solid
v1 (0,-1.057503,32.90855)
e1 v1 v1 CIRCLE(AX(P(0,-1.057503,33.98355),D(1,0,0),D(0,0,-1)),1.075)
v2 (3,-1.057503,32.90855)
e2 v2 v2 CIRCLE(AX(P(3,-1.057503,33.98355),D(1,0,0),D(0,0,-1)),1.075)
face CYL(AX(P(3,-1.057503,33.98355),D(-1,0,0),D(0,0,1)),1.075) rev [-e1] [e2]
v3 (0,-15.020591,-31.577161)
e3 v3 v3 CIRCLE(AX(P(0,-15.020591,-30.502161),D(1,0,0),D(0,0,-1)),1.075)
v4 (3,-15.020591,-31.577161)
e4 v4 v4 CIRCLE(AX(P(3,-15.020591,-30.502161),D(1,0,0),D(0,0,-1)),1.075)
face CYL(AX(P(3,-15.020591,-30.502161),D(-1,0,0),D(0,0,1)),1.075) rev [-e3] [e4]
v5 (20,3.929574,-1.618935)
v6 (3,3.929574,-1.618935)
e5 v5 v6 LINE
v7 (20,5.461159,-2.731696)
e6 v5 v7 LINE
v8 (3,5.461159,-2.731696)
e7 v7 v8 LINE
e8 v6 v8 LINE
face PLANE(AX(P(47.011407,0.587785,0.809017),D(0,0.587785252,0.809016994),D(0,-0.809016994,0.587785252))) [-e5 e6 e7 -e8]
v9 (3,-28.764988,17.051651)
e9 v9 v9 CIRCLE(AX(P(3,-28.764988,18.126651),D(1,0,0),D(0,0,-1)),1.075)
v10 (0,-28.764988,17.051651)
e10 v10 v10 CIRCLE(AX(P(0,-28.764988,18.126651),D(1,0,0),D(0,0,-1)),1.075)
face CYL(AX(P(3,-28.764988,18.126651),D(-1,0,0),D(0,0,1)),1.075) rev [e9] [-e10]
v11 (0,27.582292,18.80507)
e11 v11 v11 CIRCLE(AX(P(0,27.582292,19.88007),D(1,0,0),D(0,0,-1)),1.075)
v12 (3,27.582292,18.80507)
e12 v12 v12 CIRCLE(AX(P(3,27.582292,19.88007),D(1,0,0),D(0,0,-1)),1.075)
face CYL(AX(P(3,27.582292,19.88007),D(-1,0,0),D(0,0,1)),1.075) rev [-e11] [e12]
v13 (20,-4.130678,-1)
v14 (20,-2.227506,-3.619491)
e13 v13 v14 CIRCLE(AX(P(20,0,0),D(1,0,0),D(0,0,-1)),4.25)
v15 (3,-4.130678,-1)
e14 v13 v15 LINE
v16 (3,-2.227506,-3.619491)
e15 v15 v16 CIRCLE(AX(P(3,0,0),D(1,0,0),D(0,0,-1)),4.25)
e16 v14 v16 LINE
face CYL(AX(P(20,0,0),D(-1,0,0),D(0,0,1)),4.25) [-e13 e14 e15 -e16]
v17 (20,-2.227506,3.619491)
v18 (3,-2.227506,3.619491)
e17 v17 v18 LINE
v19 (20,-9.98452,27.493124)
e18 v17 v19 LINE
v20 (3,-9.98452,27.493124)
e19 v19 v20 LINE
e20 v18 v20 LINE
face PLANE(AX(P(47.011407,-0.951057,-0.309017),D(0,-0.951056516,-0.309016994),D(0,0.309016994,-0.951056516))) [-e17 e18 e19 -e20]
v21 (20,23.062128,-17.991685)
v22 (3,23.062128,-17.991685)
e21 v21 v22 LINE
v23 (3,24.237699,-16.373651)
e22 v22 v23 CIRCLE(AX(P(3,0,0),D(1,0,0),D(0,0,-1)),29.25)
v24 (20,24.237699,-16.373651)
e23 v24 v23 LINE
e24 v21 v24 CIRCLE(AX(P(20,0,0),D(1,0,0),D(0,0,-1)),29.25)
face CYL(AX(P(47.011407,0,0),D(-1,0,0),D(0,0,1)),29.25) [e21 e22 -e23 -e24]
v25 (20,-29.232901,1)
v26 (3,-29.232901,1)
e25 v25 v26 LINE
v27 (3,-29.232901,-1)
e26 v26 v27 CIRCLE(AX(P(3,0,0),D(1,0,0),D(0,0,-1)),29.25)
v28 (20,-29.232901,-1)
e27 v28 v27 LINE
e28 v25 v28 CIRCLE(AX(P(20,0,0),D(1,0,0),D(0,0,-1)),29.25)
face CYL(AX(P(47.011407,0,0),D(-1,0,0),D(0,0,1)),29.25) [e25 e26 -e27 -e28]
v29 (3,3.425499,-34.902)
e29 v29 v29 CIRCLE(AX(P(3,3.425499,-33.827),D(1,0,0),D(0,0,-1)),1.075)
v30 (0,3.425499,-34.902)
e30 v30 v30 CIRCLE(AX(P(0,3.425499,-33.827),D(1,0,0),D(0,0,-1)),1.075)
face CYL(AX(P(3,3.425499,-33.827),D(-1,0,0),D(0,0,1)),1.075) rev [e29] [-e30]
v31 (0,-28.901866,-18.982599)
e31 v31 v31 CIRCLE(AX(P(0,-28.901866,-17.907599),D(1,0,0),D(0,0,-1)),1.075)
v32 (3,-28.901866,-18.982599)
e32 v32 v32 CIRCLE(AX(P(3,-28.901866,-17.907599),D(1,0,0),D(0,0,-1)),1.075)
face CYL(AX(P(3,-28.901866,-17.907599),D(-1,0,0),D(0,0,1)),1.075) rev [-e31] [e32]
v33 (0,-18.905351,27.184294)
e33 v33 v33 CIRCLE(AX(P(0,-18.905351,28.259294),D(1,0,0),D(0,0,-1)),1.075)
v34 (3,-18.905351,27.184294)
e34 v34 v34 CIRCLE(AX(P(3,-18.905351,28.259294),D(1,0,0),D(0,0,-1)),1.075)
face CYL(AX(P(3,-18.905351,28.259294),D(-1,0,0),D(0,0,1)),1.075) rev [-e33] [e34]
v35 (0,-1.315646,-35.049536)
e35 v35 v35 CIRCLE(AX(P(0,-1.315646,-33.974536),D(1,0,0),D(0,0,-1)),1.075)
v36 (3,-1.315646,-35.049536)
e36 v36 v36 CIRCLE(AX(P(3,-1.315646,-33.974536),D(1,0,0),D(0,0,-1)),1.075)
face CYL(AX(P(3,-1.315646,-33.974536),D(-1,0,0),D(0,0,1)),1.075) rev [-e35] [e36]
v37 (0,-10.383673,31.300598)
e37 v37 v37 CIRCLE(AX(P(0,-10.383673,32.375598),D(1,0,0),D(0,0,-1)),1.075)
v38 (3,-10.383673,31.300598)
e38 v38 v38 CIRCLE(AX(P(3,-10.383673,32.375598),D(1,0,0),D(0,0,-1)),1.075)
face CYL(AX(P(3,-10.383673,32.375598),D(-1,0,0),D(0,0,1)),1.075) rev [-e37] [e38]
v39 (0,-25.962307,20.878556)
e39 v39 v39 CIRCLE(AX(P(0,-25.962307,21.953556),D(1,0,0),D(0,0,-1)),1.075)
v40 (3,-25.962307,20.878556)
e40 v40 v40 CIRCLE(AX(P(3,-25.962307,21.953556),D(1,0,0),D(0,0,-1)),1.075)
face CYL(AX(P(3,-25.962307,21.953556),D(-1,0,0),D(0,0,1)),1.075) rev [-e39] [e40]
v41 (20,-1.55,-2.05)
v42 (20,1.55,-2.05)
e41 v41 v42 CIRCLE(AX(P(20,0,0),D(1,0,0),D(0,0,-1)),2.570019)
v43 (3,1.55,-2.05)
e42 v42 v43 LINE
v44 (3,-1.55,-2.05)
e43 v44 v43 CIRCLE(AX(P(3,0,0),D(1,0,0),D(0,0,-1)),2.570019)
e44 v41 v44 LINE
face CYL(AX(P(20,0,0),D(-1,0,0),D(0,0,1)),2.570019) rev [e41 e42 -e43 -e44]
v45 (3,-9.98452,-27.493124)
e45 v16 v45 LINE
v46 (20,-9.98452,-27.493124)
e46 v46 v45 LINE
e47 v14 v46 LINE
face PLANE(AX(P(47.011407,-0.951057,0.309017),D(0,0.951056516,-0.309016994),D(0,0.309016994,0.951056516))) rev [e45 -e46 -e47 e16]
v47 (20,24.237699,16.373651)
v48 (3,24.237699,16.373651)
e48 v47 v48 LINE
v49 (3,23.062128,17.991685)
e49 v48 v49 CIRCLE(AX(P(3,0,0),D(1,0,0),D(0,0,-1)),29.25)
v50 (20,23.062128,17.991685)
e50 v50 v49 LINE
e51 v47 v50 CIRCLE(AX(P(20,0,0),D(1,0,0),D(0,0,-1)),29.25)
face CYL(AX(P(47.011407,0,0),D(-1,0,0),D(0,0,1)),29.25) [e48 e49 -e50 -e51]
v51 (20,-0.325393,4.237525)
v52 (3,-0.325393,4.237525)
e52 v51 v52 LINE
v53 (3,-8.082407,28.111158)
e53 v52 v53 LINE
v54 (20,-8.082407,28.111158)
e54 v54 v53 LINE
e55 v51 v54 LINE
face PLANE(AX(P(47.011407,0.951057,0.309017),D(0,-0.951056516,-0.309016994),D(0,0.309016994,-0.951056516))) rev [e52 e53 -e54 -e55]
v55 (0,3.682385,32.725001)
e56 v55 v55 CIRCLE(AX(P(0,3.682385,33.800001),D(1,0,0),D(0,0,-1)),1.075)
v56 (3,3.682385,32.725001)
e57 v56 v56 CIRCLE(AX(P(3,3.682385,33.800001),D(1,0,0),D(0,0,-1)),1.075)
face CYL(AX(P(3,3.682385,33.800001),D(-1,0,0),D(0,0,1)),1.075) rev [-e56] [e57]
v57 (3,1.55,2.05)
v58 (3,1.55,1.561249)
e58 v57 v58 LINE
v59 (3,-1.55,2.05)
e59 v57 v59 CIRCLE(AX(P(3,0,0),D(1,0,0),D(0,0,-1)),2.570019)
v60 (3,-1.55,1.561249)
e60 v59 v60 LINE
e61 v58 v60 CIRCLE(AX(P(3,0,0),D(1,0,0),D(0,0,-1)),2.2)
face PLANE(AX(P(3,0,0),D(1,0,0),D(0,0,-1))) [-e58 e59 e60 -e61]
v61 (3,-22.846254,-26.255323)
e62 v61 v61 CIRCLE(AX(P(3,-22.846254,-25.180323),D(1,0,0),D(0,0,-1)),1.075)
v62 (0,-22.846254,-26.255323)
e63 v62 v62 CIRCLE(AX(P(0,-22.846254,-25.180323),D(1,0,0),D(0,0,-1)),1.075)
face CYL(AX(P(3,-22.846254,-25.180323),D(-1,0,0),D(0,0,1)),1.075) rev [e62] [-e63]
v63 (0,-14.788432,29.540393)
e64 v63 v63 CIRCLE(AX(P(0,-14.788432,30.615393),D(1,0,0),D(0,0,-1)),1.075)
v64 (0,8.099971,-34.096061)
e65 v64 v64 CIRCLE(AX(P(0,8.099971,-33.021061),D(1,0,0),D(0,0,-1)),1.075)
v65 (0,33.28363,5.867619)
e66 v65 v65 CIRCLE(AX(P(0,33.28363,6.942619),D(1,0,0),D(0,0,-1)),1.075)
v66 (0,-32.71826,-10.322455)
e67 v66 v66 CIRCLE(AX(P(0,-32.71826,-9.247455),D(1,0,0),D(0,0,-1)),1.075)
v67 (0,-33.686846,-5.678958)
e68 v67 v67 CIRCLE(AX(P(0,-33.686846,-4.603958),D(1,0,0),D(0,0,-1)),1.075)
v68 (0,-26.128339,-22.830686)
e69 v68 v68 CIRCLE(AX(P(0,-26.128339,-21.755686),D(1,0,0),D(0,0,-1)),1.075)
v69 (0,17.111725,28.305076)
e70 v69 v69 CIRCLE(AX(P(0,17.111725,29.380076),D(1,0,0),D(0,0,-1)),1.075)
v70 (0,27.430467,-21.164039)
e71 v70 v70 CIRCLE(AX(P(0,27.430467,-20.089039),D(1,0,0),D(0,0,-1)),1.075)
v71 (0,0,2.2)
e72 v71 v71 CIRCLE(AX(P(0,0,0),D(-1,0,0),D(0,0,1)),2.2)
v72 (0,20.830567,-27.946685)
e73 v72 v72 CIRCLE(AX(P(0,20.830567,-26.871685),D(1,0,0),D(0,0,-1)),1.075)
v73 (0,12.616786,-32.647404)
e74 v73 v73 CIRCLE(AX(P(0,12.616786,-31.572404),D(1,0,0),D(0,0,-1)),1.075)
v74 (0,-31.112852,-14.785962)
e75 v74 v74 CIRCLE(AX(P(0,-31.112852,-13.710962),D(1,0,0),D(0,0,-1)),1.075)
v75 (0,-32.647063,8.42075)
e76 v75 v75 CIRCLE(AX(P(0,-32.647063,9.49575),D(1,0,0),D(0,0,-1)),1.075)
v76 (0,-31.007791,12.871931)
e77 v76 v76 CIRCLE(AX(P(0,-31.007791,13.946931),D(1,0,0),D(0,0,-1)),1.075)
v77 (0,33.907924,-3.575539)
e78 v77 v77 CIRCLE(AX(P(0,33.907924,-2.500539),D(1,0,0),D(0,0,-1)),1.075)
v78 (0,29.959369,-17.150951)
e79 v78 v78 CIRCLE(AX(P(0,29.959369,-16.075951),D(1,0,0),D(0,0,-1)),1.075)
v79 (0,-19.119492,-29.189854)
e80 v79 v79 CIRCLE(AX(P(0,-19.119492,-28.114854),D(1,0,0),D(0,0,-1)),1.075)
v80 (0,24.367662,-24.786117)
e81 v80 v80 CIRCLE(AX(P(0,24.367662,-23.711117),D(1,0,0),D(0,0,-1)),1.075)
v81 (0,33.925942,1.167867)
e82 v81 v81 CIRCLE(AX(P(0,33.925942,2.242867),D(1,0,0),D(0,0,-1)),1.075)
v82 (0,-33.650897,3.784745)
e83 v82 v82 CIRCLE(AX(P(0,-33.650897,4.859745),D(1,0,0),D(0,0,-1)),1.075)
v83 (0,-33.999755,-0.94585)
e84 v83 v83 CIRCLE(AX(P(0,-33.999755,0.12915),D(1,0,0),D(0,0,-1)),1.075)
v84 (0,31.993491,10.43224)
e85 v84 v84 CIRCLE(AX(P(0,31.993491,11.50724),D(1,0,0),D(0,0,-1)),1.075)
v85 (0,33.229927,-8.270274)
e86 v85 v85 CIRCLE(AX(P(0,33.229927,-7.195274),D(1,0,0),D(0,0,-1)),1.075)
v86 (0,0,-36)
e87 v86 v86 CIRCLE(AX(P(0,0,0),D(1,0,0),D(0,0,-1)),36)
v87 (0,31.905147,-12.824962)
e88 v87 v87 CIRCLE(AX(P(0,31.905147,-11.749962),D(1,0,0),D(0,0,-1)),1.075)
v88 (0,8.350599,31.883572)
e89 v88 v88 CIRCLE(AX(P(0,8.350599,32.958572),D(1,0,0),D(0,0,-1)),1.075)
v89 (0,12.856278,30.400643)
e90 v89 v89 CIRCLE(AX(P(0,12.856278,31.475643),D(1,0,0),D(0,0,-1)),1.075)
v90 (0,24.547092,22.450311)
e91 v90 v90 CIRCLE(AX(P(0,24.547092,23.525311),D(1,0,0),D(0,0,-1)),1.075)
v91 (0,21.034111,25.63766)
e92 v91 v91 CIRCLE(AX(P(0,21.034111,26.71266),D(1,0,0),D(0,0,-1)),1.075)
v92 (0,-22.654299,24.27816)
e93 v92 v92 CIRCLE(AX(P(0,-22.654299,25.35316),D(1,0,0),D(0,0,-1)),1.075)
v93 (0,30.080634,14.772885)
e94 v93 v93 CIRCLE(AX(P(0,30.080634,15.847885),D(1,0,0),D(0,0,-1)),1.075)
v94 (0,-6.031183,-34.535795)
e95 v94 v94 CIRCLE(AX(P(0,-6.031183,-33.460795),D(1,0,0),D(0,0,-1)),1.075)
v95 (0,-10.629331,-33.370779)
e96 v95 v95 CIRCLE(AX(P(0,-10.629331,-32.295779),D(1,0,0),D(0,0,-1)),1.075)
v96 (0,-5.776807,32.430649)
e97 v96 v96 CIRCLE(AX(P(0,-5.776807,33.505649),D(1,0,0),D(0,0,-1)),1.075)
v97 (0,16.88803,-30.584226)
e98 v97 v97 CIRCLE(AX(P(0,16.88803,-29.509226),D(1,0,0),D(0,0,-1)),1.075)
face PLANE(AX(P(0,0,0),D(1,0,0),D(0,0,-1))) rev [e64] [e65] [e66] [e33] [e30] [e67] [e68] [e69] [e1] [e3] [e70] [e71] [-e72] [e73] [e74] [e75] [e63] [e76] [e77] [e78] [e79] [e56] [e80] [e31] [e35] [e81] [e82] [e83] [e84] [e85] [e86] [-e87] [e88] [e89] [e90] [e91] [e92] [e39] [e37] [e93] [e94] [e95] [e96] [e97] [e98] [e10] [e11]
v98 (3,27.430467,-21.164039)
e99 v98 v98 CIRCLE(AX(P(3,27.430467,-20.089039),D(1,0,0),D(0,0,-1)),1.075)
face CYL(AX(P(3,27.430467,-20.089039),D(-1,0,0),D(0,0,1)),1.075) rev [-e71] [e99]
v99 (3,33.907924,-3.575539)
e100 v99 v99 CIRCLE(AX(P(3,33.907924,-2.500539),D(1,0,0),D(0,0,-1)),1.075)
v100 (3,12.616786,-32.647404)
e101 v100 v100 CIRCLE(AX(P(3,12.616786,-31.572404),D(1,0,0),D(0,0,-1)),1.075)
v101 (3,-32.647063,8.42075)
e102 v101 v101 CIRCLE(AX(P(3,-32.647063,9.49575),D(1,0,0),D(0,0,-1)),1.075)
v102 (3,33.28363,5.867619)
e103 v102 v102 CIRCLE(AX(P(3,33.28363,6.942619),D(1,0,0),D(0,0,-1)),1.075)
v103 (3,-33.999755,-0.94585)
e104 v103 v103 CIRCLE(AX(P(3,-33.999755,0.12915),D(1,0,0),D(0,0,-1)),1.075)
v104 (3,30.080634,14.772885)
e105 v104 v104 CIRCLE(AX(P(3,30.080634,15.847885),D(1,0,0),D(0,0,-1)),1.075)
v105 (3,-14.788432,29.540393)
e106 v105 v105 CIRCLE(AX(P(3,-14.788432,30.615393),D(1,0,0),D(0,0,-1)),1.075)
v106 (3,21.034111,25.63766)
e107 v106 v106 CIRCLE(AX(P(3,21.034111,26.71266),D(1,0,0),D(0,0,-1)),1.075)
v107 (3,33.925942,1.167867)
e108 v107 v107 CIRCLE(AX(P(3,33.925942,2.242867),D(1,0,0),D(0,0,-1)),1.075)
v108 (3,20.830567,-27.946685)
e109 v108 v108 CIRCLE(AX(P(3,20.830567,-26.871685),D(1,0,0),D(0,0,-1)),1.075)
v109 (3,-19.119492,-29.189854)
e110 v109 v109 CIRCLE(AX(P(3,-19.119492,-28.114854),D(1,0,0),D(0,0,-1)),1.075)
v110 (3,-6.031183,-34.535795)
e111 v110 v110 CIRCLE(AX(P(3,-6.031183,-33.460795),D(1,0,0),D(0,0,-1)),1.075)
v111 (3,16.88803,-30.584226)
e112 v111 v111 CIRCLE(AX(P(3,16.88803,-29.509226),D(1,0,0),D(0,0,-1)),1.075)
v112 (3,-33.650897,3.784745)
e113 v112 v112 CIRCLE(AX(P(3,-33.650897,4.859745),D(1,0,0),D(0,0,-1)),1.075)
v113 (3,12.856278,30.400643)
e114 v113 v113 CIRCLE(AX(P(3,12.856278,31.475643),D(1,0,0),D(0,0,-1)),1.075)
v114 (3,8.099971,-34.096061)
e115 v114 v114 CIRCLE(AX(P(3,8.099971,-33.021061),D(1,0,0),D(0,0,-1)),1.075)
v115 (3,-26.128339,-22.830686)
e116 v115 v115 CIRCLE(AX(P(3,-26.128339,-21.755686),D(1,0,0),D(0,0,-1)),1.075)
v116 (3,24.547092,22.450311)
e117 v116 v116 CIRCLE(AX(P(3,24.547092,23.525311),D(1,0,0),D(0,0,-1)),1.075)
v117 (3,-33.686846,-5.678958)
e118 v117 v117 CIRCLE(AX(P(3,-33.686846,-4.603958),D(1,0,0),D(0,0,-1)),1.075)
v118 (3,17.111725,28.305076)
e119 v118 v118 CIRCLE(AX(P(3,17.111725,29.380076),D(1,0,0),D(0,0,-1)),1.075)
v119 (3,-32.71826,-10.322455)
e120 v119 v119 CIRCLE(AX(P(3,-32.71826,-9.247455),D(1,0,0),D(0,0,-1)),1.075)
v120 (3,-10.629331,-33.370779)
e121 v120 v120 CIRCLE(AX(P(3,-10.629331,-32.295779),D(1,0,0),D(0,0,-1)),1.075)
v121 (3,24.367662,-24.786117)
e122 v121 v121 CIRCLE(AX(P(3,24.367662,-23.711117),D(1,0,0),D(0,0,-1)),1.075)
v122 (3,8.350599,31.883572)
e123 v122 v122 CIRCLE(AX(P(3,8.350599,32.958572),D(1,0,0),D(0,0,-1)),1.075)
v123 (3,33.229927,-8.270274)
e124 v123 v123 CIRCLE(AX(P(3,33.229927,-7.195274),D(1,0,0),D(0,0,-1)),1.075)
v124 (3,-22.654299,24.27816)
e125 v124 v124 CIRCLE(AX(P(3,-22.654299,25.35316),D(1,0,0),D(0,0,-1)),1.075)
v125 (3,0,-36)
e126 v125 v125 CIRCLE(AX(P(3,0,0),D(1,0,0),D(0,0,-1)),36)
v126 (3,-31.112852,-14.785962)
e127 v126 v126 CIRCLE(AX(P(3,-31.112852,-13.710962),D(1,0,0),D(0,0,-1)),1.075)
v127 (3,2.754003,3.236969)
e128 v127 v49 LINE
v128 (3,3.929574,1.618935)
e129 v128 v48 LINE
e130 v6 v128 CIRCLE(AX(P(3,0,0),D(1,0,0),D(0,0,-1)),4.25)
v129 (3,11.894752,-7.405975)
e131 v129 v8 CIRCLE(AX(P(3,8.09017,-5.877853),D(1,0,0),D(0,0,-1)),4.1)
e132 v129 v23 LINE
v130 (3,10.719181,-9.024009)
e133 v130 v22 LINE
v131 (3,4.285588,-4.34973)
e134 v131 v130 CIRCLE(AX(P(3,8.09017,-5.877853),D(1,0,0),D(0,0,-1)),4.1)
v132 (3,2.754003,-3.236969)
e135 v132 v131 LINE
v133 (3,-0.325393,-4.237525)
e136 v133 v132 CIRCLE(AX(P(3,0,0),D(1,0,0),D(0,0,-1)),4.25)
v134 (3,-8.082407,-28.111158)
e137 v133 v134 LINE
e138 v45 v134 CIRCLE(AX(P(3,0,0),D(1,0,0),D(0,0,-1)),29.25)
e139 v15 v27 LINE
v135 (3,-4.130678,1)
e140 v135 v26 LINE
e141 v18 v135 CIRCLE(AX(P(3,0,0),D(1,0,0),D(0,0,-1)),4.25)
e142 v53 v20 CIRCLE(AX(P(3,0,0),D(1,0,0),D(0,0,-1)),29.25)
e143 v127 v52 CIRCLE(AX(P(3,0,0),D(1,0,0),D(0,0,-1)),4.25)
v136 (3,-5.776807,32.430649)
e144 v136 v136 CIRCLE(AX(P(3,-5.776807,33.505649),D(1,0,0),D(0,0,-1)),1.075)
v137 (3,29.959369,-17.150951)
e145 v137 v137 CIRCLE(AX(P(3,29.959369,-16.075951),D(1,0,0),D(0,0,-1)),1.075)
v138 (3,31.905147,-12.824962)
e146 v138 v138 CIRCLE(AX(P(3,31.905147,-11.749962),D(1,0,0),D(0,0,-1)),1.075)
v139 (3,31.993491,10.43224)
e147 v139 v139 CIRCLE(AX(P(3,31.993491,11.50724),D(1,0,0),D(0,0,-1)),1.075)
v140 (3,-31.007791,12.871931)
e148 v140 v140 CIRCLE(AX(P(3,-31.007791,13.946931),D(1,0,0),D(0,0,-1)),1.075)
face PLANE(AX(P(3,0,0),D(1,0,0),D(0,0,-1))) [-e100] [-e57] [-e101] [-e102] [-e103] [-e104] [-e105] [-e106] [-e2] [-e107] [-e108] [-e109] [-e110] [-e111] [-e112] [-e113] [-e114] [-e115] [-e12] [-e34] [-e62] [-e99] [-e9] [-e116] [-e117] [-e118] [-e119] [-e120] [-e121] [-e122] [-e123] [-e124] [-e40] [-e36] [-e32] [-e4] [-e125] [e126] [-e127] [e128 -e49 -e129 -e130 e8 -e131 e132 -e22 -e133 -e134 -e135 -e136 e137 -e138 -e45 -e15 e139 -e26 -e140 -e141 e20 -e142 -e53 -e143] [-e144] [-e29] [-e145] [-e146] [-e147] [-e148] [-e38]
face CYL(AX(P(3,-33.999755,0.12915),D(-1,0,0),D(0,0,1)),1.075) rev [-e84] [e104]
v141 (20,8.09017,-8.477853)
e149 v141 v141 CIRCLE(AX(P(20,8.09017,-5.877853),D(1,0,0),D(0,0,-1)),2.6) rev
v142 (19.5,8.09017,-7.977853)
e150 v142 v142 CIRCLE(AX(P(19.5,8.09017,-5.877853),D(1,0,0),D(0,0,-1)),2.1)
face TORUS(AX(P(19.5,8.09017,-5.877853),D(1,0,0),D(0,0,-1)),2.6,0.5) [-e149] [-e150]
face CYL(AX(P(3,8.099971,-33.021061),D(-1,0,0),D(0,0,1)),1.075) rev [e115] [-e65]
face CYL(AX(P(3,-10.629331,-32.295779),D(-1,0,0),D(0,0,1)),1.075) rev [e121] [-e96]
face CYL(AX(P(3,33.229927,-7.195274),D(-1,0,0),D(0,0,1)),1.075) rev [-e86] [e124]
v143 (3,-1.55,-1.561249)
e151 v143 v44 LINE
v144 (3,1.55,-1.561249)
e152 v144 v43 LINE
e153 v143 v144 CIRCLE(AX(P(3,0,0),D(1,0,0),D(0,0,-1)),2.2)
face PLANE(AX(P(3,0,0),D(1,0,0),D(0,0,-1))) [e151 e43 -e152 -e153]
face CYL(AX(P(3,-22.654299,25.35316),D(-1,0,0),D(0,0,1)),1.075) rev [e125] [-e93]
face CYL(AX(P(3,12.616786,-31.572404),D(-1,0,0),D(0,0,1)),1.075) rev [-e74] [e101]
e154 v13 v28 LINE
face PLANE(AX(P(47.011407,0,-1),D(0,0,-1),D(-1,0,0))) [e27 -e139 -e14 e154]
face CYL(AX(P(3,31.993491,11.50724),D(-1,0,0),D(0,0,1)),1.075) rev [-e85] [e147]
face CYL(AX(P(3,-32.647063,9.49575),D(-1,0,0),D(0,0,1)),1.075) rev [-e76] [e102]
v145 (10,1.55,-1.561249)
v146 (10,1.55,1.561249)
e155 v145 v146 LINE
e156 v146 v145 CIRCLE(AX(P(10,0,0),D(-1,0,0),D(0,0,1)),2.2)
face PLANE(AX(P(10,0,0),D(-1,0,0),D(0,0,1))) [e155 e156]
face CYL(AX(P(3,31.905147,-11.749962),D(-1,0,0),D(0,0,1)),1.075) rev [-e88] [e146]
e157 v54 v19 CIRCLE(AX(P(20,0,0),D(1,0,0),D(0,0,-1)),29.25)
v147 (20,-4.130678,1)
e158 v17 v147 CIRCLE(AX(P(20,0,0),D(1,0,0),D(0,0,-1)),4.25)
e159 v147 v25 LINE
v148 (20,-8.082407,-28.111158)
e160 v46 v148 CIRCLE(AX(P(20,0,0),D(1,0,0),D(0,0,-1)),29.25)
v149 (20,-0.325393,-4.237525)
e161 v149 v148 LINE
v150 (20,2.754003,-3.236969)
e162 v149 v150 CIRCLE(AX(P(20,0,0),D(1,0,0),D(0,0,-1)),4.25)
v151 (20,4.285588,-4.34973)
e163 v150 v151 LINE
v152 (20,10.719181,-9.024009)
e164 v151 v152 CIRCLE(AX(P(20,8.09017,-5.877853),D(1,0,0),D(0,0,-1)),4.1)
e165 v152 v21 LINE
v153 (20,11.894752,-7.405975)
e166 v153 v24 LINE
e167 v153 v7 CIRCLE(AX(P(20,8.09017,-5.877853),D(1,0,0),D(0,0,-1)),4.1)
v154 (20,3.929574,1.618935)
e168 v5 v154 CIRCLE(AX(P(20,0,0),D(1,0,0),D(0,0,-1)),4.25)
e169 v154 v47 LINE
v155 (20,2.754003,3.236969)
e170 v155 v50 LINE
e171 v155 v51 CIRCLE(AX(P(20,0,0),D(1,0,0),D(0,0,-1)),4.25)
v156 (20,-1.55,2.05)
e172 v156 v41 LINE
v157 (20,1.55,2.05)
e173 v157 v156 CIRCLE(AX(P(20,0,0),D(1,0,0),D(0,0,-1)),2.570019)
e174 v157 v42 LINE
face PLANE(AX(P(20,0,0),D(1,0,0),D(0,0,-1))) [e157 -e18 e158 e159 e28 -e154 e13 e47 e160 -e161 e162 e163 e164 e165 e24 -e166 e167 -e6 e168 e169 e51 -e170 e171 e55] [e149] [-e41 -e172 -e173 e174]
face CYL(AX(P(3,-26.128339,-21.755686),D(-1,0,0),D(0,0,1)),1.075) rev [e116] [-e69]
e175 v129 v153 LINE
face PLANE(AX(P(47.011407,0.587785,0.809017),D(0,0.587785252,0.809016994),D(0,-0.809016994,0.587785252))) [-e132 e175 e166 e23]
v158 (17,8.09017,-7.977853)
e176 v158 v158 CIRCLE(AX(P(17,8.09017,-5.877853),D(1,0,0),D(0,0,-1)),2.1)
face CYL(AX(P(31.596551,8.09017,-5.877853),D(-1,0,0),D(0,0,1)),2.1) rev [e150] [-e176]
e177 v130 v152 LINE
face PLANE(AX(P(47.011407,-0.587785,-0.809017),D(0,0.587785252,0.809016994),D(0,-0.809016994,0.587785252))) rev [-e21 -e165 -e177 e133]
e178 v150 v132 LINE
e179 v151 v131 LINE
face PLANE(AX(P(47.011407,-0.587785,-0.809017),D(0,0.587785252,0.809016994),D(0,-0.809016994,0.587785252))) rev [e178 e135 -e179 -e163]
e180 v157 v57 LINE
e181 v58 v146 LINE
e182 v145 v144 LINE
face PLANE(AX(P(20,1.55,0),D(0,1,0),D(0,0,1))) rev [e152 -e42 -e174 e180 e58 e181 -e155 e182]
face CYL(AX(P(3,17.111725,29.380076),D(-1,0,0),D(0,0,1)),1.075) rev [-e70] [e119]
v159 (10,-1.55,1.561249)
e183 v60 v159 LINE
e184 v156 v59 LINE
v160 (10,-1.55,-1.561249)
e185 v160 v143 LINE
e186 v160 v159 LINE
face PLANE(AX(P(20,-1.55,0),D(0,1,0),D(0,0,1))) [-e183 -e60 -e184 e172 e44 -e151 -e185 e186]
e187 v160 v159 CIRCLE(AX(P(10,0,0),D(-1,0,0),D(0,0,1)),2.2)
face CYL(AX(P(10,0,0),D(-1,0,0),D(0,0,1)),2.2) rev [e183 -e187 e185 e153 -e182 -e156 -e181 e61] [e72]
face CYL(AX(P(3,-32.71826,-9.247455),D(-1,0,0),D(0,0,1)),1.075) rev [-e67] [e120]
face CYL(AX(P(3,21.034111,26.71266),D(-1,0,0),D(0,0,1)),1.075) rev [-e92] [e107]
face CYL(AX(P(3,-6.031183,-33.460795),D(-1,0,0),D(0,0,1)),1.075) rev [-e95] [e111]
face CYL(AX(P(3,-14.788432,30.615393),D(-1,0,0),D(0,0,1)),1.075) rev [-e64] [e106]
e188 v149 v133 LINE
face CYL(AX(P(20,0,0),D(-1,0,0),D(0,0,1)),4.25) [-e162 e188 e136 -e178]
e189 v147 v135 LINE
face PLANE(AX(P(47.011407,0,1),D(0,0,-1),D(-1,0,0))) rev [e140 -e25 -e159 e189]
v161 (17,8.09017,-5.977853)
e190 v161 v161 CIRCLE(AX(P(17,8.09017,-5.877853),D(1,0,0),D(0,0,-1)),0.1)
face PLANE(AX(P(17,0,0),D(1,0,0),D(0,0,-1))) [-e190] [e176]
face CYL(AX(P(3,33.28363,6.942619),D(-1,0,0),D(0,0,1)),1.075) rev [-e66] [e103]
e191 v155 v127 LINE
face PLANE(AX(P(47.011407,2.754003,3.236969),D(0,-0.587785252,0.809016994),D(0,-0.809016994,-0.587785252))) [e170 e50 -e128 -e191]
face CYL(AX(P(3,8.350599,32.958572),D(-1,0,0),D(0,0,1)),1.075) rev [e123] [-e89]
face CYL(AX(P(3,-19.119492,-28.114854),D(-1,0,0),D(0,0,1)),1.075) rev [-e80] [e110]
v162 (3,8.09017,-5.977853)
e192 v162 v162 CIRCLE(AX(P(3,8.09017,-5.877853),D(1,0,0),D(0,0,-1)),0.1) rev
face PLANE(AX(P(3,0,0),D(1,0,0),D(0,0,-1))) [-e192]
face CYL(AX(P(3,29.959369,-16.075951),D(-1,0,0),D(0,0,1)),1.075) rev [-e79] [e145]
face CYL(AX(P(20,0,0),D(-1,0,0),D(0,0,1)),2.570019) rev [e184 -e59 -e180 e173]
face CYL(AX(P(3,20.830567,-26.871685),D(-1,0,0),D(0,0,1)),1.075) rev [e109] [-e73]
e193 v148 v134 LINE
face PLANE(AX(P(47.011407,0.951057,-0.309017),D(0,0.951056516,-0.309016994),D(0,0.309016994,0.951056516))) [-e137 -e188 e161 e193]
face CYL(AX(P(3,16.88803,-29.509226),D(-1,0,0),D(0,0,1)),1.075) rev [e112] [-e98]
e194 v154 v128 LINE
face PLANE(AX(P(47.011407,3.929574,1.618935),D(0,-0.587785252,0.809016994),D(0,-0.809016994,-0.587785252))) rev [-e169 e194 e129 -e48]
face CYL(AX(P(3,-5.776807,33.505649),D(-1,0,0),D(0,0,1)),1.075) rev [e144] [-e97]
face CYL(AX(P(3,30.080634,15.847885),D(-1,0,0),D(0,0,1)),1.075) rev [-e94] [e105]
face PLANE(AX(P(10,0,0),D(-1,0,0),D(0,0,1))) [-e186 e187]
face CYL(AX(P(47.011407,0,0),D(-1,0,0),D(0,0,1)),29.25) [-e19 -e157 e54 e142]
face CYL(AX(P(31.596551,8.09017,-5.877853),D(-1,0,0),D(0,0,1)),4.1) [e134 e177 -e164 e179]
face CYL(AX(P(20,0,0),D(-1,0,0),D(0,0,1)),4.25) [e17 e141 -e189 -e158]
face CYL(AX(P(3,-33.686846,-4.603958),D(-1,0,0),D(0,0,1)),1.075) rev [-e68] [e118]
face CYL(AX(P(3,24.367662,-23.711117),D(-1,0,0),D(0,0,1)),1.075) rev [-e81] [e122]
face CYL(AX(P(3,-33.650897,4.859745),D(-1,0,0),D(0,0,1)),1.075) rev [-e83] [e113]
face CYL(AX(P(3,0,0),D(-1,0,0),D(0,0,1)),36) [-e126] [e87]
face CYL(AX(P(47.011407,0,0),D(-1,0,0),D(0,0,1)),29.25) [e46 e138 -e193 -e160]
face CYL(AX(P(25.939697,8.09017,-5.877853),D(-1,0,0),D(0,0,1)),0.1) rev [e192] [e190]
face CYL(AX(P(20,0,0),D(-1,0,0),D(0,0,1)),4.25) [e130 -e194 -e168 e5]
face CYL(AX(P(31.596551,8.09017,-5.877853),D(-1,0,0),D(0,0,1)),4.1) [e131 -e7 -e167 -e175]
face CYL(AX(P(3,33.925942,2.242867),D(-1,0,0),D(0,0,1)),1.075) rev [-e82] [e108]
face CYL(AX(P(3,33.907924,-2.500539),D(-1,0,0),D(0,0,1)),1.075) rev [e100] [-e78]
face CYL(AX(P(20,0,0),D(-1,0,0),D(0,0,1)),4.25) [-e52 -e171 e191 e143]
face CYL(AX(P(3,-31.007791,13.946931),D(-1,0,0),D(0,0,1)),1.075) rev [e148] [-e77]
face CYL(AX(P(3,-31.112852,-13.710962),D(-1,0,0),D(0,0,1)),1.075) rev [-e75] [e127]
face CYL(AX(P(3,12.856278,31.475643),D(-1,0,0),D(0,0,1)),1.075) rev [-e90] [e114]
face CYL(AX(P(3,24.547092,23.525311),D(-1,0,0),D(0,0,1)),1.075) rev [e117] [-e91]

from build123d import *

# Parameters (mm, degrees)
SKETCH1_R                 = 36
SKETCH1_R_2               = 1.075
SKETCH1_R_3               = 4.25
BOSS_EXTRUDE1_DEPTH       = 3
SKETCH1_3_R               = 4.25
BOSS_EXTRUDE2_DEPTH       = 20
BOSS_EXTRUDE3_DEPTH       = 3
BOSS_EXTRUDE5_DEPTH       = 17
SKETCH3_R                 = 2.2
CUT_EXTRUDE1_DEPTH        = 10
BOSS_EXTRUDE6_DEPTH       = 17
CUT_EXTRUDE2_START        = 3
CUT_EXTRUDE2_DEPTH        = 17
BOSS_EXTRUDE7_START       = 3
BOSS_EXTRUDE7_OUTLINE_R   = 2.1
BOSS_EXTRUDE7_OUTLINE_R_2 = 0.1
BOSS_EXTRUDE7_DEPTH       = 14
FILLET1_R                 = 0.5


# Read off the part's stored shape, not the designer's step: Cut-Extrude2, Boss-Extrude7
with BuildPart() as part:
    # Sketch1 → Boss-Extrude1 (new body)
    with BuildSketch(Plane(origin=(0, 0, 0), x_dir=(0, 0, -1), z_dir=(1, 0, 0))):
        Circle(SKETCH1_R)
        with Locations((20.089039043, 27.430466826)):
            Circle(SKETCH1_R_2, mode=Mode.SUBTRACT)
        with Locations((23.711117025, 24.36766155)):
            Circle(SKETCH1_R_2, mode=Mode.SUBTRACT)
        with Locations((26.871685085, 20.830567459)):
            Circle(SKETCH1_R_2, mode=Mode.SUBTRACT)
        with Locations((29.509226361, 16.888030067)):
            Circle(SKETCH1_R_2, mode=Mode.SUBTRACT)
        with Locations((31.572404113, 12.61678638)):
            Circle(SKETCH1_R_2, mode=Mode.SUBTRACT)
        with Locations((33.021060931, 8.099971297)):
            Circle(SKETCH1_R_2, mode=Mode.SUBTRACT)
        with Locations((33.827000359, 3.425499486)):
            Circle(SKETCH1_R_2, mode=Mode.SUBTRACT)
        with Locations((33.974535702, -1.315645775)):
            Circle(SKETCH1_R_2, mode=Mode.SUBTRACT)
        with Locations((33.460795354, -6.031183488)):
            Circle(SKETCH1_R_2, mode=Mode.SUBTRACT)
        with Locations((32.295778685, -10.629331075)):
            Circle(SKETCH1_R_2, mode=Mode.SUBTRACT)
        with Locations((30.50216142, -15.020590824)):
            Circle(SKETCH1_R_2, mode=Mode.SUBTRACT)
        with Locations((28.114854279, -19.119491857)):
            Circle(SKETCH1_R_2, mode=Mode.SUBTRACT)
        with Locations((25.180323479, -22.84625373)):
            Circle(SKETCH1_R_2, mode=Mode.SUBTRACT)
        with Locations((21.755686325, -26.128339261)):
            Circle(SKETCH1_R_2, mode=Mode.SUBTRACT)
        with Locations((17.907599484, -28.901866388)):
            Circle(SKETCH1_R_2, mode=Mode.SUBTRACT)
        with Locations((13.710961588, -31.112851562)):
            Circle(SKETCH1_R_2, mode=Mode.SUBTRACT)
        with Locations((9.24745542, -32.718260471)):
            Circle(SKETCH1_R_2, mode=Mode.SUBTRACT)
        with Locations((4.603958052, -33.686845656)):
            Circle(SKETCH1_R_2, mode=Mode.SUBTRACT)
        with Locations((-0.129150123, -33.999754709)):
            Circle(SKETCH1_R_2, mode=Mode.SUBTRACT)
        with Locations((-4.859744537, -33.65089721)):
            Circle(SKETCH1_R_2, mode=Mode.SUBTRACT)
        with Locations((-9.495749552, -32.647063274)):
            Circle(SKETCH1_R_2, mode=Mode.SUBTRACT)
        with Locations((-13.946930604, -31.007791388)):
            Circle(SKETCH1_R_2, mode=Mode.SUBTRACT)
        with Locations((-18.126650515, -28.764988112)):
            Circle(SKETCH1_R_2, mode=Mode.SUBTRACT)
        with Locations((-21.953555793, -25.962307063)):
            Circle(SKETCH1_R_2, mode=Mode.SUBTRACT)
        with Locations((-25.353160079, -22.654299239)):
            Circle(SKETCH1_R_2, mode=Mode.SUBTRACT)
        with Locations((-28.259293943, -18.905351249)):
            Circle(SKETCH1_R_2, mode=Mode.SUBTRACT)
        with Locations((-30.615392795, -14.788432101)):
            Circle(SKETCH1_R_2, mode=Mode.SUBTRACT)
        with Locations((-32.375597851, -10.383672944)):
            Circle(SKETCH1_R_2, mode=Mode.SUBTRACT)
        with Locations((-33.505648721, -5.776807404)):
            Circle(SKETCH1_R_2, mode=Mode.SUBTRACT)
        with Locations((-33.983550251, -1.057502879)):
            Circle(SKETCH1_R_2, mode=Mode.SUBTRACT)
        with Locations((-33.800000631, 3.682384736)):
            Circle(SKETCH1_R_2, mode=Mode.SUBTRACT)
        with Locations((-32.958572446, 8.350598921)):
            Circle(SKETCH1_R_2, mode=Mode.SUBTRACT)
        with Locations((-31.475643138, 12.856278197)):
            Circle(SKETCH1_R_2, mode=Mode.SUBTRACT)
        with Locations((-29.380076239, 17.111724641)):
            Circle(SKETCH1_R_2, mode=Mode.SUBTRACT)
        with Locations((-26.712659575, 21.03411083)):
            Circle(SKETCH1_R_2, mode=Mode.SUBTRACT)
        with Locations((-23.525311378, 24.547091977)):
            Circle(SKETCH1_R_2, mode=Mode.SUBTRACT)
        with Locations((-19.880069755, 27.582291901)):
            Circle(SKETCH1_R_2, mode=Mode.SUBTRACT)
        with Locations((-15.847885187, 30.080633888)):
            Circle(SKETCH1_R_2, mode=Mode.SUBTRACT)
        with Locations((-11.507239561, 31.993490552)):
            Circle(SKETCH1_R_2, mode=Mode.SUBTRACT)
        with Locations((-6.942618606, 33.283630314)):
            Circle(SKETCH1_R_2, mode=Mode.SUBTRACT)
        with Locations((-2.242867477, 33.925942072)):
            Circle(SKETCH1_R_2, mode=Mode.SUBTRACT)
        with Locations((2.500538516, 33.907923958)):
            Circle(SKETCH1_R_2, mode=Mode.SUBTRACT)
        with Locations((7.195274371, 33.229926673)):
            Circle(SKETCH1_R_2, mode=Mode.SUBTRACT)
        with Locations((11.749962396, 31.905146665)):
            Circle(SKETCH1_R_2, mode=Mode.SUBTRACT)
        with Locations((16.075950767, 29.959369268)):
            Circle(SKETCH1_R_2, mode=Mode.SUBTRACT)
        Circle(SKETCH1_R_3, mode=Mode.SUBTRACT)
    extrude(amount=BOSS_EXTRUDE1_DEPTH)

    # Sketch1<3> → Boss-Extrude2 (add)
    with BuildSketch(Plane(origin=(0, 0, 0), x_dir=(0, 0, -1), z_dir=(1, 0, 0))):
        Circle(SKETCH1_3_R)
        with BuildLine():
            ThreePointArc((2.05, -1.55), (2.570019455, 0), (2.05, 1.55))
            Line((2.05, 1.55), (-2.05, 1.55))
            ThreePointArc((-2.05, 1.55), (-2.570019455, 0), (-2.05, -1.55))
            Line((-2.05, -1.55), (2.05, -1.55))
        make_face(mode=Mode.SUBTRACT)
    extrude(amount=BOSS_EXTRUDE2_DEPTH)

    # Sketch1<4> → Boss-Extrude3 (add)
    with BuildSketch(Plane(origin=(0, 0, 0), x_dir=(0, 0, -1), z_dir=(1, 0, 0))):
        with BuildLine():
            Line((-2.05, -1.55), (2.05, -1.55))
            ThreePointArc((2.05, -1.55), (2.570019455, 0), (2.05, 1.55))
            Line((2.05, 1.55), (-2.05, 1.55))
            ThreePointArc((-2.05, 1.55), (-2.570019455, 0), (-2.05, -1.55))
        make_face()
    extrude(amount=BOSS_EXTRUDE3_DEPTH)

    # Sketch2 → Boss-Extrude5 (add)
    with BuildSketch(Plane(origin=(3, 0, 0), x_dir=(0, 0, -1), z_dir=(1, 0, 0))):
        with BuildLine():
            Line((-27.493123978, -9.984519716), (-3.619491149, -2.227506189))
            ThreePointArc((-3.619491149, -2.227506189), (-4.041990194, -1.313322226), (-4.237525138, -0.325393156))
            Line((-4.237525138, -0.325393156), (-28.111157966, -8.082406683))
            ThreePointArc((-28.111157966, -8.082406683), (-27.818403102, -9.038747085), (-27.493123978, -9.984519716))
        make_face()
        with BuildLine():
            ThreePointArc((1.618934563, 3.92957388), (2.498087322, 3.438322226), (3.236968552, 2.754003376))
            Line((3.236968552, 2.754003376), (17.991685075, 23.062128439))
            ThreePointArc((17.991685075, 23.062128439), (17.19271863, 23.663747085), (16.373651086, 24.237698944))
            Line((16.373651086, 24.237698944), (1.618934563, 3.92957388))
        make_face()
        with BuildLine():
            ThreePointArc((4.237525138, -0.325393156), (4.041990194, -1.313322226), (3.619491149, -2.227506189))
            Line((3.619491149, -2.227506189), (27.493123978, -9.984519716))
            ThreePointArc((27.493123978, -9.984519716), (27.818403102, -9.038747085), (28.111157966, -8.082406683))
            Line((28.111157966, -8.082406683), (4.237525138, -0.325393156))
        make_face()
        with BuildLine():
            ThreePointArc((1, -4.13067791), (0, -4.25), (-1, -4.13067791))
            Line((-1, -4.13067791), (-1, -29.232900985))
            ThreePointArc((-1, -29.232900985), (0, -29.25), (1, -29.232900985))
            Line((1, -29.232900985), (1, -4.13067791))
        make_face()
        with BuildLine():
            Line((-3.236968552, 2.754003376), (-17.991685075, 23.062128439))
            ThreePointArc((-17.991685075, 23.062128439), (-17.19271863, 23.663747085), (-16.373651086, 24.237698944))
            Line((-16.373651086, 24.237698944), (-1.618934563, 3.92957388))
            ThreePointArc((-1.618934563, 3.92957388), (-2.498087322, 3.438322226), (-3.236968552, 2.754003376))
        make_face()
    extrude(amount=BOSS_EXTRUDE5_DEPTH)

    # Sketch3 → Cut-Extrude1 (cut)
    with BuildSketch(Plane.ZY):
        Circle(SKETCH3_R)
    extrude(amount=-CUT_EXTRUDE1_DEPTH, mode=Mode.SUBTRACT)

    # Sketch6 → Boss-Extrude6 (add)
    with BuildSketch(Plane(origin=(3, 0, 0), x_dir=(0, 0, -1), z_dir=(1, 0, 0))):
        with BuildLine():
            ThreePointArc((9.977852523, 8.090169944), (9.530979272, 9.951530993), (8.287772057, 11.407139621))
            Line((8.287772057, 11.407139621), (7.112201553, 9.789105632))
            ThreePointArc((7.112201553, 9.789105632), (7.748966224, 9.043549993), (7.977852523, 8.090169944))
            ThreePointArc((7.977852523, 8.090169944), (6.831232572, 6.219056243), (4.643503493, 6.391234256))
            Line((4.643503493, 6.391234256), (3.467932989, 4.773200267))
            ThreePointArc((3.467932989, 4.773200267), (7.739213572, 4.437043195), (9.977852523, 8.090169944))
        make_face()
        with BuildLine():
            Line((7.112201553, 9.789105632), (8.287772057, 11.407139621))
            ThreePointArc((8.287772057, 11.407139621), (2.560882846, 10.500089478), (3.467932989, 4.773200267))
            Line((3.467932989, 4.773200267), (4.643503493, 6.391234256))
            ThreePointArc((4.643503493, 6.391234256), (4.178916835, 9.324518974), (7.112201553, 9.789105632))
        make_face()
    extrude(amount=BOSS_EXTRUDE6_DEPTH)

    # Cut-Extrude2 outline → Cut-Extrude2 (cut)
    with BuildSketch(Plane.YZ.offset(CUT_EXTRUDE2_START)):
        with BuildLine():
            Line((10.17190097, -6.154250668), (7.184009422, -3.983420389))
            ThreePointArc((7.184009422, -3.983420389), (6.391234256, -4.643503493), (6.008438918, -5.601454378))
            Line((6.008438918, -5.601454378), (8.996330465, -7.772284657))
            ThreePointArc((8.996330465, -7.772284657), (9.789105632, -7.112201553), (10.17190097, -6.154250668))
        make_face()
    extrude(amount=CUT_EXTRUDE2_DEPTH, mode=Mode.SUBTRACT)

    # Boss-Extrude7 outline → Boss-Extrude7 (add)
    with BuildSketch(Plane.YZ.offset(BOSS_EXTRUDE7_START)):
        with Locations((8.090169944, -5.877852523)):
            Circle(BOSS_EXTRUDE7_OUTLINE_R)
        with Locations((8.090169944, -5.877852523)):
            Circle(BOSS_EXTRUDE7_OUTLINE_R_2, mode=Mode.SUBTRACT)
    extrude(amount=BOSS_EXTRUDE7_DEPTH)

    # Fillet1
    fillet1_edges = [part.edges().sort_by_distance(p)[0] for p in [
        (20, 6.855820914, -7.576788211),
    ]]
    fillet(fillet1_edges, radius=FILLET1_R)


solid = part.part
